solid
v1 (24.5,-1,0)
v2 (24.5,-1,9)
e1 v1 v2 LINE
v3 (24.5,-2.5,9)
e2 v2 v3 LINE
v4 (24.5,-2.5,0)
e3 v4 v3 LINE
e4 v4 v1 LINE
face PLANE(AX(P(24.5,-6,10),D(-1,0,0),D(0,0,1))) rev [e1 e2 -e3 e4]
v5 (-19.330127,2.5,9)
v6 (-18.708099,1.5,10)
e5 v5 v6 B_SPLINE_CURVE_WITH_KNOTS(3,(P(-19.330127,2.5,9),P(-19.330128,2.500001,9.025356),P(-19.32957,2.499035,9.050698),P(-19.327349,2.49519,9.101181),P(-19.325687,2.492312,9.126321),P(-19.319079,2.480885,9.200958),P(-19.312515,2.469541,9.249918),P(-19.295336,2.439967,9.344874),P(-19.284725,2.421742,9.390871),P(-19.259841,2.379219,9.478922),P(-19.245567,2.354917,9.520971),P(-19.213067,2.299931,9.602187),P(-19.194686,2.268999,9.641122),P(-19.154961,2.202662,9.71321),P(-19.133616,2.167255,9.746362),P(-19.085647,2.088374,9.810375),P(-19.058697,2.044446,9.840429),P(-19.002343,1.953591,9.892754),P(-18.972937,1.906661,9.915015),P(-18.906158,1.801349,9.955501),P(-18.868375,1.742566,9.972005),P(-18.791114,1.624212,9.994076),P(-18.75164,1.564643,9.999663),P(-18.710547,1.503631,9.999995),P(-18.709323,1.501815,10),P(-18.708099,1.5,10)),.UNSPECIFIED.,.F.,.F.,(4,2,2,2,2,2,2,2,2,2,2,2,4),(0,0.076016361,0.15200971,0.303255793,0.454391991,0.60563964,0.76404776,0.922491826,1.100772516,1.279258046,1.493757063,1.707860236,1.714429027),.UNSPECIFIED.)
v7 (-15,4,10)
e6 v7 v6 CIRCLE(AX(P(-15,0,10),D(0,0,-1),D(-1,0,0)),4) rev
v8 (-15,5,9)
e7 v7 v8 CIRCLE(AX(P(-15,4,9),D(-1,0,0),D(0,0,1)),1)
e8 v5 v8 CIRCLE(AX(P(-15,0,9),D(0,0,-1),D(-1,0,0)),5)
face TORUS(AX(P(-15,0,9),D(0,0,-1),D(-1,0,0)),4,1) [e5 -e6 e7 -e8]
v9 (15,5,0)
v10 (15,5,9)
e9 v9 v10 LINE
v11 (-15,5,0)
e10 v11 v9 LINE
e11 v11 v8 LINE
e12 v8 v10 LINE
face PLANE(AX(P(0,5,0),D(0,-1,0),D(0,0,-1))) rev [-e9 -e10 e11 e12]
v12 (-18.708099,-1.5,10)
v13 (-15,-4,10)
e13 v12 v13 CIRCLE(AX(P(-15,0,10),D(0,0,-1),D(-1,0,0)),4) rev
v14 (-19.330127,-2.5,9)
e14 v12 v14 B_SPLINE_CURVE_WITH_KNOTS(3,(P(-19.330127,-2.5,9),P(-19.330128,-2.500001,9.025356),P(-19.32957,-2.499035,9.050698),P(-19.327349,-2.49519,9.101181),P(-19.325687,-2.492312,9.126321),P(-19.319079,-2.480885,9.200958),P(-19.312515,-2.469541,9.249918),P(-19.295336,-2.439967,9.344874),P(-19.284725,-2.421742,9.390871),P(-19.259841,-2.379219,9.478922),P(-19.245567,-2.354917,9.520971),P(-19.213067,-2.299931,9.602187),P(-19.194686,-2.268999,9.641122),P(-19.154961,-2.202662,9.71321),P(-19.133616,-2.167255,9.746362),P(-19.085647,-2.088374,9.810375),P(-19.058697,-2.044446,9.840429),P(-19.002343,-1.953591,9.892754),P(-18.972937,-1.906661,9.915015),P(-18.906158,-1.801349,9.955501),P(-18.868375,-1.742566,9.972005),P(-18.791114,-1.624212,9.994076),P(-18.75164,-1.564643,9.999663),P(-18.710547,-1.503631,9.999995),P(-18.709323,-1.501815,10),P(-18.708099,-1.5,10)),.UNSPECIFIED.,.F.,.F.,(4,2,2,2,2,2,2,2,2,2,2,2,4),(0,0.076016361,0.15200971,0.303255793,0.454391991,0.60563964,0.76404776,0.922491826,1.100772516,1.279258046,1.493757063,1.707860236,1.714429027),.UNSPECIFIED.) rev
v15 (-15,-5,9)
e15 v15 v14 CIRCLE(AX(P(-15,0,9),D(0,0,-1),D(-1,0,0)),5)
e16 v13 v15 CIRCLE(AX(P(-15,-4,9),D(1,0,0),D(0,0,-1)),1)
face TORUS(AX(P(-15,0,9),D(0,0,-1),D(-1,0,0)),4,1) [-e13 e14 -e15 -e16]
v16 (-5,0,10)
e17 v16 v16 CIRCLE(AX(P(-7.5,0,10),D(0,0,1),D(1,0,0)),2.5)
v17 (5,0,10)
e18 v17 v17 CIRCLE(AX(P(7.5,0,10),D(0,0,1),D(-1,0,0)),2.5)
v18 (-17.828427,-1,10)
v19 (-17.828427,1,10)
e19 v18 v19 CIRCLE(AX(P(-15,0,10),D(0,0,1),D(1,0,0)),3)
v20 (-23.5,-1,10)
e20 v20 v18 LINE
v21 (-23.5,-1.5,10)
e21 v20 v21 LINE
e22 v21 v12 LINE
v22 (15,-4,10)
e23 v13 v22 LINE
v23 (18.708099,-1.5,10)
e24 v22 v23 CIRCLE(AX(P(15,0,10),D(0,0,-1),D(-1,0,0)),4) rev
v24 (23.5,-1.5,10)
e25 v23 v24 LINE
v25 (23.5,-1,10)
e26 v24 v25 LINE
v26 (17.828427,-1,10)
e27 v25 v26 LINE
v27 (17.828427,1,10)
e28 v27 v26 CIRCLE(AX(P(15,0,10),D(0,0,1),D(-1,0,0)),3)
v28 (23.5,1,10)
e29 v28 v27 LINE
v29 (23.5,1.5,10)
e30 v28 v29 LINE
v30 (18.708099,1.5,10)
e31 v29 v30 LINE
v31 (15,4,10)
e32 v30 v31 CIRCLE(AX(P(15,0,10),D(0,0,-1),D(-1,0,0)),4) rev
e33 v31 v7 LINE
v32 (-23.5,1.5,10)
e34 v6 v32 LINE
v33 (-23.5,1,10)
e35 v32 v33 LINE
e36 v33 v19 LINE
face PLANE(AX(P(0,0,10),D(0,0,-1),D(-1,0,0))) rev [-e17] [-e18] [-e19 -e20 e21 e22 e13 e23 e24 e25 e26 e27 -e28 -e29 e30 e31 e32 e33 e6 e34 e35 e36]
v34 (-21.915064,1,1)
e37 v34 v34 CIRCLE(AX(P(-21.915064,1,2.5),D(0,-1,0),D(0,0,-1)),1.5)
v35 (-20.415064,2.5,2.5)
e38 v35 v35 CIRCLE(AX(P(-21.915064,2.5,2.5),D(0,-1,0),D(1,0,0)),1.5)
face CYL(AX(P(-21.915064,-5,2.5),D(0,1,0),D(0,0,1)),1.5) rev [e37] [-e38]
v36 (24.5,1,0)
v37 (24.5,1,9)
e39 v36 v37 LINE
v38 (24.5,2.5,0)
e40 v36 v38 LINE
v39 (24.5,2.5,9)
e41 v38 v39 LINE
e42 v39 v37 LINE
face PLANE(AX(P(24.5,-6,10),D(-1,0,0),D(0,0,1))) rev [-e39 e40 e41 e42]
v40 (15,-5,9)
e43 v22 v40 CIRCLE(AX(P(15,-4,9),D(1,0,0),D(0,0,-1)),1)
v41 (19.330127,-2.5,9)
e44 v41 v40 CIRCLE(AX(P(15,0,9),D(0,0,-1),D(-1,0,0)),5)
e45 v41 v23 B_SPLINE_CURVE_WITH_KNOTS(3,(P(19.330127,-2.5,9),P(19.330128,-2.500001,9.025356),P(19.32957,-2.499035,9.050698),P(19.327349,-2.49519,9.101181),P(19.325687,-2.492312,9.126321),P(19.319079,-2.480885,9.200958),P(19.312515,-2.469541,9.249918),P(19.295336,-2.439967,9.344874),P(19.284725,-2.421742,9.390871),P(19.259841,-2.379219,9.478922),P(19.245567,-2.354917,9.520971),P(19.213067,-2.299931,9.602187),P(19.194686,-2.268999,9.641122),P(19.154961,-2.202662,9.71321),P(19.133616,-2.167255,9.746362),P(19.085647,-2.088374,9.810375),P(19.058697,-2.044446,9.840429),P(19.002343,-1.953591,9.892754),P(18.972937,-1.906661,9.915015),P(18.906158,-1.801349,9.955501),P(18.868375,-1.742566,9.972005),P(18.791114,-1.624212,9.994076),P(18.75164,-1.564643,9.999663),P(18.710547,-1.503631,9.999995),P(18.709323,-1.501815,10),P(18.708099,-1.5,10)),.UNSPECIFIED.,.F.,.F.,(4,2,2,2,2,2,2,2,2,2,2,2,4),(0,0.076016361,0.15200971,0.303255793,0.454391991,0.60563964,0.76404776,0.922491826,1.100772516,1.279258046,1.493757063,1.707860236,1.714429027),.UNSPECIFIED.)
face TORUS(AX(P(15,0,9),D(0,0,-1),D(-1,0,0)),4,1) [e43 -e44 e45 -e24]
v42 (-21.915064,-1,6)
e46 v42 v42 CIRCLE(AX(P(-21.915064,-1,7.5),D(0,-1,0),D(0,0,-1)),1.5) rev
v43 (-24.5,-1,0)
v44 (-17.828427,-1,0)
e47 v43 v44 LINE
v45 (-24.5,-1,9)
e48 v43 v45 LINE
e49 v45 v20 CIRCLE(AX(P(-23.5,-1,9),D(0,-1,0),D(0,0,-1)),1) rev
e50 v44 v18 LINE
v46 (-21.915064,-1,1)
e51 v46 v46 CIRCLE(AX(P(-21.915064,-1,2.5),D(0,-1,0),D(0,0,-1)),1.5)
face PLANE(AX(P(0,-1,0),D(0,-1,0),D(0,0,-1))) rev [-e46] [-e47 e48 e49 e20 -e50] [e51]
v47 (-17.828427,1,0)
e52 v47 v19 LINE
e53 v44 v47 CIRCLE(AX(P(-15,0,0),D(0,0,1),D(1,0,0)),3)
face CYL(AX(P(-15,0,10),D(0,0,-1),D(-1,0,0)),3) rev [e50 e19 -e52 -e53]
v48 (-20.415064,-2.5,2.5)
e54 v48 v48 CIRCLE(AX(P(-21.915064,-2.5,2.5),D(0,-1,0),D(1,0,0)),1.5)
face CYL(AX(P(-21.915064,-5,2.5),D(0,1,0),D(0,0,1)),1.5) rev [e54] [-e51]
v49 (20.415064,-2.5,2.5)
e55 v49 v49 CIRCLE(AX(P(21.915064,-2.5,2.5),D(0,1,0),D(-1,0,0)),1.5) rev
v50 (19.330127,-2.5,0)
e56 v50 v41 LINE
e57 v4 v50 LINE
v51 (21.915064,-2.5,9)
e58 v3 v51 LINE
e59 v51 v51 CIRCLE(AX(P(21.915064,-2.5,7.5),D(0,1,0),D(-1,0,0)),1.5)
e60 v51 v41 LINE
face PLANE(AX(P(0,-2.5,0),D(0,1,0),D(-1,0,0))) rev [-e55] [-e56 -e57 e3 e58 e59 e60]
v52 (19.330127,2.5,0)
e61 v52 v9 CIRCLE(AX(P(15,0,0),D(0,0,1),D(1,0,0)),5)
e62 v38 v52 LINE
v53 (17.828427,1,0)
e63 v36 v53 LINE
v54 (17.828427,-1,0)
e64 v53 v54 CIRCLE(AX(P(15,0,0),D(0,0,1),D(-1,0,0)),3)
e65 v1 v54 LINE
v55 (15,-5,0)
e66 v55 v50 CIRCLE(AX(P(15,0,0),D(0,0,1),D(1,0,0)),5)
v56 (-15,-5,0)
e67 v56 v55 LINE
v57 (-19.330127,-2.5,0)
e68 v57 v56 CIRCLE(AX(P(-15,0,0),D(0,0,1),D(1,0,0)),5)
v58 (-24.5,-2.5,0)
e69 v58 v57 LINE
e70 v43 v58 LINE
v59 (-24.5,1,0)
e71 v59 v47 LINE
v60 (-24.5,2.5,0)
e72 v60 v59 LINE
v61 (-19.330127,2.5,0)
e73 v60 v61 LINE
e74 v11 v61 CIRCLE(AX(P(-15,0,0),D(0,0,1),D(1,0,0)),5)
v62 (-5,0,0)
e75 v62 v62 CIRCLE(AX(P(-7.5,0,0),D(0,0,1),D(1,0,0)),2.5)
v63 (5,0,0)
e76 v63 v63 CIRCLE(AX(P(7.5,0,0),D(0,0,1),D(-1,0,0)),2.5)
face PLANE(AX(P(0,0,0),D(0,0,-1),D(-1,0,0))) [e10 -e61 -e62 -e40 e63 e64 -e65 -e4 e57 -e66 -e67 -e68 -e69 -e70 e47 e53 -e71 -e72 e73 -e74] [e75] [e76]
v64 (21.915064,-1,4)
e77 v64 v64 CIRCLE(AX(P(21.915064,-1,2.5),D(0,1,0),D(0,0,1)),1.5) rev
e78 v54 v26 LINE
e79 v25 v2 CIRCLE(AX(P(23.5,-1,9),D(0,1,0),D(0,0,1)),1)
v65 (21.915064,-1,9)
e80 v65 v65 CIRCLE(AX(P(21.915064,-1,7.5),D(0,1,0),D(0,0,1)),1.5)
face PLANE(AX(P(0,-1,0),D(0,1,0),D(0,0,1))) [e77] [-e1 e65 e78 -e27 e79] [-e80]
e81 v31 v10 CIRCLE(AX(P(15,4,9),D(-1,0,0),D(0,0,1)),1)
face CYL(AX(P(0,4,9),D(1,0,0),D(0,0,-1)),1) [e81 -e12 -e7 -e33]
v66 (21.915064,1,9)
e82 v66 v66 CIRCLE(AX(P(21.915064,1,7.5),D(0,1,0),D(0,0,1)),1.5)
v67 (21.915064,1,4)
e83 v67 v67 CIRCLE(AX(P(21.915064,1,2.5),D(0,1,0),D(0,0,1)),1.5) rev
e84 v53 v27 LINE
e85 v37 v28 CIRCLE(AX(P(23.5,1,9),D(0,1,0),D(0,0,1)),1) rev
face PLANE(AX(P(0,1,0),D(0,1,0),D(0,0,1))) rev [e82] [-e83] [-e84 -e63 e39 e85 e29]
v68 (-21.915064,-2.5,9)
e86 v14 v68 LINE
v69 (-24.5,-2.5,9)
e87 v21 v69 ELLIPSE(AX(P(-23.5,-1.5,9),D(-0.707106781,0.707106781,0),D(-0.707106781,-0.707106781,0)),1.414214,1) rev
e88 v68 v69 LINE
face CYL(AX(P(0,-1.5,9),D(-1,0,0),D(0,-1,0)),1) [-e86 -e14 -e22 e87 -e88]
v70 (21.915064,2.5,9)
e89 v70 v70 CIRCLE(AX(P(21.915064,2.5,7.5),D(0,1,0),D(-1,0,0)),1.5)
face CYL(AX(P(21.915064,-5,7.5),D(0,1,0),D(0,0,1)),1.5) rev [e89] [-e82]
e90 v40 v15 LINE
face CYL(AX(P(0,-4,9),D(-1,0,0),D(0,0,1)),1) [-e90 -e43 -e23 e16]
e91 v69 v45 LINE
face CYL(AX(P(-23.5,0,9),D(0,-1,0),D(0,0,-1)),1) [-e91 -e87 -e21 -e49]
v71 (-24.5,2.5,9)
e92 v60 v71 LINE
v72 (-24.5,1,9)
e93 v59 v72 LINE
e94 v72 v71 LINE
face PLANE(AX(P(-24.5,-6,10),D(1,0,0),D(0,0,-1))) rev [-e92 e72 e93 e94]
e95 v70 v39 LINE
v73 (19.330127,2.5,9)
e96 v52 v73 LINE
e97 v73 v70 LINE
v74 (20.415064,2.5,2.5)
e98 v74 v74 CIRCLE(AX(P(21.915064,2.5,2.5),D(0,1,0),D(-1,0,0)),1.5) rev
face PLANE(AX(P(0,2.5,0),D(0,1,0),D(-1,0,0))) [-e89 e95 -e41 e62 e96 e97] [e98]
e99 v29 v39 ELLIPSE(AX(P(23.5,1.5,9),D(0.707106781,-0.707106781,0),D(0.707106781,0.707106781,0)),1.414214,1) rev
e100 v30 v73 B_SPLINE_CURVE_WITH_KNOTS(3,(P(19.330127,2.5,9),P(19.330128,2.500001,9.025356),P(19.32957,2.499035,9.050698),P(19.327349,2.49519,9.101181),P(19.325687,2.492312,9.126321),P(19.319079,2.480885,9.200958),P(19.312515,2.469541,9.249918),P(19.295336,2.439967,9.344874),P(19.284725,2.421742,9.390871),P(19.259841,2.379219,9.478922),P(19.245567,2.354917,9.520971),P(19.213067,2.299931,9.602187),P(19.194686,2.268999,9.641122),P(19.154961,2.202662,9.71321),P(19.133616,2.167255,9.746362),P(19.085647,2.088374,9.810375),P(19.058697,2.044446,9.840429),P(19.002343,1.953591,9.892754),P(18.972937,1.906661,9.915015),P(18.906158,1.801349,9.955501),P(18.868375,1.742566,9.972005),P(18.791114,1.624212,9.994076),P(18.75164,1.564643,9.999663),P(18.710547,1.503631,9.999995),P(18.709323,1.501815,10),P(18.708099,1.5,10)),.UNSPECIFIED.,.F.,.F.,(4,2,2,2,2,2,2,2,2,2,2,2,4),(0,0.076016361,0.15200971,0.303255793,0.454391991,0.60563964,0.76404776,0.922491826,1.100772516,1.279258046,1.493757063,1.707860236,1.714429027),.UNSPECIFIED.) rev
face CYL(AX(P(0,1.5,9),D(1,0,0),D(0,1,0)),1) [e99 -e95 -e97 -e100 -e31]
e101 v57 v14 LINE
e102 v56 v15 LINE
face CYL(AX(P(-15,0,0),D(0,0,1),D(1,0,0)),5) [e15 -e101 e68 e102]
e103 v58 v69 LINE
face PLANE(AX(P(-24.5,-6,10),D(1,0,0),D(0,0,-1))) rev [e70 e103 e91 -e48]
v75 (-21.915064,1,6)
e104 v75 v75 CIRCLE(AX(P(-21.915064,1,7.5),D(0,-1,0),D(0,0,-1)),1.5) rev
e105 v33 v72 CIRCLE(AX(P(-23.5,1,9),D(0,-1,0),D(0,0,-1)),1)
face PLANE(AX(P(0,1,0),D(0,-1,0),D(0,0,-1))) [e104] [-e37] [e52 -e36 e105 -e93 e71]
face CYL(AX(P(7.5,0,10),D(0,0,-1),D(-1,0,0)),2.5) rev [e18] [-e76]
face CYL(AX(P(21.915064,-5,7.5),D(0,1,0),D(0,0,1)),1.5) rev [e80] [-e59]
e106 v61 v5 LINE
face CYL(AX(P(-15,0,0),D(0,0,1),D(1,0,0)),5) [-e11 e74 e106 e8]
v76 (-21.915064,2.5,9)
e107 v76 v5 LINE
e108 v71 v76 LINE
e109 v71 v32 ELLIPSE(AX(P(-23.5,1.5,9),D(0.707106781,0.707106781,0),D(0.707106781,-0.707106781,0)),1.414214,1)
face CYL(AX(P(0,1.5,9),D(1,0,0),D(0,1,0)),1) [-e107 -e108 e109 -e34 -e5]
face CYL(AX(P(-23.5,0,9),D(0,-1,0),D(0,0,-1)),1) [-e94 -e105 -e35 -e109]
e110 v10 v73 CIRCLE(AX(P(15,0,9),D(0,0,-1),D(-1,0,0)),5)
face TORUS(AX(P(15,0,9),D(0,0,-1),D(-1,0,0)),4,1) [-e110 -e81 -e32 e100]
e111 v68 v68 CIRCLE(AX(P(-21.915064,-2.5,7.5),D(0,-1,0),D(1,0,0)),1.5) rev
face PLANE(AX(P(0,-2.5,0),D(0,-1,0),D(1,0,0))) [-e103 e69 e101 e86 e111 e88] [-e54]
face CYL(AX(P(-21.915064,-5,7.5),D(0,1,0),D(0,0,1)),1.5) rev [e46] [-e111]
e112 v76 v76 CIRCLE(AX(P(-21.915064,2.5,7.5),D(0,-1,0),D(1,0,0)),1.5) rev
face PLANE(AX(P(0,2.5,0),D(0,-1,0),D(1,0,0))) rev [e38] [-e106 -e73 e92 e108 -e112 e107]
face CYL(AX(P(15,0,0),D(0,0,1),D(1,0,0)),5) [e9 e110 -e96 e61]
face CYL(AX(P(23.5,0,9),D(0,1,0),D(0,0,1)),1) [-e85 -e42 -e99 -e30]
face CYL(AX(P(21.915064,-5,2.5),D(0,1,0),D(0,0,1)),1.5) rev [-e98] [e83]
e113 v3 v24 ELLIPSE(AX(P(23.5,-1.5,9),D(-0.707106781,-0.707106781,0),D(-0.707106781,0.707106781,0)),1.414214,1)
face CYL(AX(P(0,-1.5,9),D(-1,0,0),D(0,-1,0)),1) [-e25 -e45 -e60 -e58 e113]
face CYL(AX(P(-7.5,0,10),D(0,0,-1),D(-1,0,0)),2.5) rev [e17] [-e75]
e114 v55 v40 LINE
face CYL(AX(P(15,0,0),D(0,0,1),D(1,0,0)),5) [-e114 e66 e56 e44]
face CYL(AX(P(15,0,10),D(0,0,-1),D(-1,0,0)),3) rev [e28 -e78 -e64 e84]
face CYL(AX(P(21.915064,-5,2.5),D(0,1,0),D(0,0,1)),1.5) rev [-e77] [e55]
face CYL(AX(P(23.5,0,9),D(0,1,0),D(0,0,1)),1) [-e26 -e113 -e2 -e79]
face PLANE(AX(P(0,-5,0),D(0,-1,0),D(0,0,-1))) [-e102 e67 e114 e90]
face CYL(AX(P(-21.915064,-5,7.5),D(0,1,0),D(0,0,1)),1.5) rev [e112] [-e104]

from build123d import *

# Parameters (mm, degrees)
SKETCH_1_W          = 49
SKETCH_1_H          = 12
SKETCH_1_R          = 3
SKETCH_1_R_2        = 2.5
EXTRUDE_1_DEPTH     = 10
CUT_EXTRUDE_1_DEPTH = 28.133927102
SKETCH_3_R          = 1.5
CUT_EXTRUDE_2_DEPTH = 29.28869032
FILLET_1_R          = 1


with BuildPart() as part:
    # 스케치1 → 보스-돌출1 (new body)
    with BuildSketch(Plane.XY):
        Rectangle(SKETCH_1_W, SKETCH_1_H)
        with Locations((-15, 0)):
            Circle(SKETCH_1_R, mode=Mode.SUBTRACT)
        with Locations(Location((15, 0, 0), (0, 0, 180))):
            Circle(SKETCH_1_R, mode=Mode.SUBTRACT)
        with Locations((-7.5, 0)):
            Circle(SKETCH_1_R_2, mode=Mode.SUBTRACT)
        with Locations(Location((7.5, 0, 0), (0, 0, 180))):
            Circle(SKETCH_1_R_2, mode=Mode.SUBTRACT)
    extrude(amount=EXTRUDE_1_DEPTH)

    # 스케치2 → 컷-돌출1 (cut, through all)
    with BuildSketch(Plane.XY.offset(10)):
        with BuildLine():
            ThreePointArc((-19.330127019, 2.5), (-17.5, 4.330127019), (-15, 5))
            Line((-15, 5), (15, 5))
            ThreePointArc((15, 5), (17.5, 4.330127019), (19.330127019, 2.5))
            Line((19.330127019, 2.5), (24.5, 2.5))
            Line((24.5, 2.5), (24.5, 6))
            Line((24.5, 6), (-24.5, 6))
            Line((-24.5, 6), (-24.5, 2.5))
            Line((-24.5, 2.5), (-19.330127019, 2.5))
        make_face()
        with BuildLine():
            ThreePointArc((-15, -5), (-17.5, -4.330127019), (-19.330127019, -2.5))
            Line((-19.330127019, -2.5), (-24.5, -2.5))
            Line((-24.5, -2.5), (-24.5, -6))
            Line((-24.5, -6), (24.5, -6))
            Line((24.5, -6), (24.5, -2.5))
            Line((24.5, -2.5), (19.330127019, -2.5))
            ThreePointArc((19.330127019, -2.5), (17.5, -4.330127019), (15, -5))
            Line((15, -5), (-15, -5))
        make_face()
        with BuildLine():
            ThreePointArc((-19.898979486, -1), (-20, 0), (-19.898979486, 1))
            Line((-19.898979486, 1), (-24.5, 1))
            Line((-24.5, 1), (-24.5, -1))
            Line((-24.5, -1), (-19.898979486, -1))
        make_face()
        with BuildLine():
            Line((24.5, 1), (19.898979486, 1))
            ThreePointArc((19.898979486, 1), (20, 0), (19.898979486, -1))
            Line((19.898979486, -1), (24.5, -1))
            Line((24.5, -1), (24.5, 1))
        make_face()
        with BuildLine():
            Line((-17.828427125, 1), (-19.898979486, 1))
            ThreePointArc((-19.898979486, 1), (-20, 0), (-19.898979486, -1))
            Line((-19.898979486, -1), (-17.828427125, -1))
            ThreePointArc((-17.828427125, -1), (-18, 0), (-17.828427125, 1))
        make_face()
        with BuildLine():
            ThreePointArc((19.898979486, -1), (20, 0), (19.898979486, 1))
            Line((19.898979486, 1), (17.828427125, 1))
            ThreePointArc((17.828427125, 1), (17.956795679, 0.507305936), (18, 0))
            ThreePointArc((18, 0), (17.956795679, -0.507305936), (17.828427125, -1))
            Line((17.828427125, -1), (19.898979486, -1))
        make_face()
    extrude(amount=-CUT_EXTRUDE_1_DEPTH, mode=Mode.SUBTRACT)

    # 스케치3 → 컷-돌출2 (cut, through all)
    with BuildSketch(Plane(origin=(0, 5, 0), x_dir=(1, 0, 0), z_dir=(0, 1, 0))):
        with Locations((-21.915063509, -2.5)):
            Circle(SKETCH_3_R)
        with Locations((-21.915063509, -7.5)):
            Circle(SKETCH_3_R)
        with Locations(Location((21.915063509, -7.5, 0), (0, 0, 270))):
            Circle(SKETCH_3_R)
        with Locations(Location((21.915063509, -2.5, 0), (0, 0, 270))):
            Circle(SKETCH_3_R)
    extrude(amount=-CUT_EXTRUDE_2_DEPTH, mode=Mode.SUBTRACT)

    # 필렛1
    fillet_1_edges = [part.edges().sort_by_distance(p)[0] for p in [
        (-24.5, 1.75, 10),
        (17.5, 4.330127019, 10),
        (-17.5, 4.330127019, 10),
        (21.915063509, 2.5, 10),
        (-21.915063509, 2.5, 10),
        (0, 5, 10),
        (24.5, -1.75, 10),
        (17.5, -4.330127019, 10),
        (-21.915063509, -2.5, 10),
        (-17.5, -4.330127019, 10),
        (0, -5, 10),
        (21.915063509, -2.5, 10),
        (-24.5, -1.75, 10),
        (24.5, 1.75, 10),
    ]]
    fillet(fillet_1_edges, radius=FILLET_1_R - 0.0001)  # a hair under: the kernel refuses the full size


solid = part.part
